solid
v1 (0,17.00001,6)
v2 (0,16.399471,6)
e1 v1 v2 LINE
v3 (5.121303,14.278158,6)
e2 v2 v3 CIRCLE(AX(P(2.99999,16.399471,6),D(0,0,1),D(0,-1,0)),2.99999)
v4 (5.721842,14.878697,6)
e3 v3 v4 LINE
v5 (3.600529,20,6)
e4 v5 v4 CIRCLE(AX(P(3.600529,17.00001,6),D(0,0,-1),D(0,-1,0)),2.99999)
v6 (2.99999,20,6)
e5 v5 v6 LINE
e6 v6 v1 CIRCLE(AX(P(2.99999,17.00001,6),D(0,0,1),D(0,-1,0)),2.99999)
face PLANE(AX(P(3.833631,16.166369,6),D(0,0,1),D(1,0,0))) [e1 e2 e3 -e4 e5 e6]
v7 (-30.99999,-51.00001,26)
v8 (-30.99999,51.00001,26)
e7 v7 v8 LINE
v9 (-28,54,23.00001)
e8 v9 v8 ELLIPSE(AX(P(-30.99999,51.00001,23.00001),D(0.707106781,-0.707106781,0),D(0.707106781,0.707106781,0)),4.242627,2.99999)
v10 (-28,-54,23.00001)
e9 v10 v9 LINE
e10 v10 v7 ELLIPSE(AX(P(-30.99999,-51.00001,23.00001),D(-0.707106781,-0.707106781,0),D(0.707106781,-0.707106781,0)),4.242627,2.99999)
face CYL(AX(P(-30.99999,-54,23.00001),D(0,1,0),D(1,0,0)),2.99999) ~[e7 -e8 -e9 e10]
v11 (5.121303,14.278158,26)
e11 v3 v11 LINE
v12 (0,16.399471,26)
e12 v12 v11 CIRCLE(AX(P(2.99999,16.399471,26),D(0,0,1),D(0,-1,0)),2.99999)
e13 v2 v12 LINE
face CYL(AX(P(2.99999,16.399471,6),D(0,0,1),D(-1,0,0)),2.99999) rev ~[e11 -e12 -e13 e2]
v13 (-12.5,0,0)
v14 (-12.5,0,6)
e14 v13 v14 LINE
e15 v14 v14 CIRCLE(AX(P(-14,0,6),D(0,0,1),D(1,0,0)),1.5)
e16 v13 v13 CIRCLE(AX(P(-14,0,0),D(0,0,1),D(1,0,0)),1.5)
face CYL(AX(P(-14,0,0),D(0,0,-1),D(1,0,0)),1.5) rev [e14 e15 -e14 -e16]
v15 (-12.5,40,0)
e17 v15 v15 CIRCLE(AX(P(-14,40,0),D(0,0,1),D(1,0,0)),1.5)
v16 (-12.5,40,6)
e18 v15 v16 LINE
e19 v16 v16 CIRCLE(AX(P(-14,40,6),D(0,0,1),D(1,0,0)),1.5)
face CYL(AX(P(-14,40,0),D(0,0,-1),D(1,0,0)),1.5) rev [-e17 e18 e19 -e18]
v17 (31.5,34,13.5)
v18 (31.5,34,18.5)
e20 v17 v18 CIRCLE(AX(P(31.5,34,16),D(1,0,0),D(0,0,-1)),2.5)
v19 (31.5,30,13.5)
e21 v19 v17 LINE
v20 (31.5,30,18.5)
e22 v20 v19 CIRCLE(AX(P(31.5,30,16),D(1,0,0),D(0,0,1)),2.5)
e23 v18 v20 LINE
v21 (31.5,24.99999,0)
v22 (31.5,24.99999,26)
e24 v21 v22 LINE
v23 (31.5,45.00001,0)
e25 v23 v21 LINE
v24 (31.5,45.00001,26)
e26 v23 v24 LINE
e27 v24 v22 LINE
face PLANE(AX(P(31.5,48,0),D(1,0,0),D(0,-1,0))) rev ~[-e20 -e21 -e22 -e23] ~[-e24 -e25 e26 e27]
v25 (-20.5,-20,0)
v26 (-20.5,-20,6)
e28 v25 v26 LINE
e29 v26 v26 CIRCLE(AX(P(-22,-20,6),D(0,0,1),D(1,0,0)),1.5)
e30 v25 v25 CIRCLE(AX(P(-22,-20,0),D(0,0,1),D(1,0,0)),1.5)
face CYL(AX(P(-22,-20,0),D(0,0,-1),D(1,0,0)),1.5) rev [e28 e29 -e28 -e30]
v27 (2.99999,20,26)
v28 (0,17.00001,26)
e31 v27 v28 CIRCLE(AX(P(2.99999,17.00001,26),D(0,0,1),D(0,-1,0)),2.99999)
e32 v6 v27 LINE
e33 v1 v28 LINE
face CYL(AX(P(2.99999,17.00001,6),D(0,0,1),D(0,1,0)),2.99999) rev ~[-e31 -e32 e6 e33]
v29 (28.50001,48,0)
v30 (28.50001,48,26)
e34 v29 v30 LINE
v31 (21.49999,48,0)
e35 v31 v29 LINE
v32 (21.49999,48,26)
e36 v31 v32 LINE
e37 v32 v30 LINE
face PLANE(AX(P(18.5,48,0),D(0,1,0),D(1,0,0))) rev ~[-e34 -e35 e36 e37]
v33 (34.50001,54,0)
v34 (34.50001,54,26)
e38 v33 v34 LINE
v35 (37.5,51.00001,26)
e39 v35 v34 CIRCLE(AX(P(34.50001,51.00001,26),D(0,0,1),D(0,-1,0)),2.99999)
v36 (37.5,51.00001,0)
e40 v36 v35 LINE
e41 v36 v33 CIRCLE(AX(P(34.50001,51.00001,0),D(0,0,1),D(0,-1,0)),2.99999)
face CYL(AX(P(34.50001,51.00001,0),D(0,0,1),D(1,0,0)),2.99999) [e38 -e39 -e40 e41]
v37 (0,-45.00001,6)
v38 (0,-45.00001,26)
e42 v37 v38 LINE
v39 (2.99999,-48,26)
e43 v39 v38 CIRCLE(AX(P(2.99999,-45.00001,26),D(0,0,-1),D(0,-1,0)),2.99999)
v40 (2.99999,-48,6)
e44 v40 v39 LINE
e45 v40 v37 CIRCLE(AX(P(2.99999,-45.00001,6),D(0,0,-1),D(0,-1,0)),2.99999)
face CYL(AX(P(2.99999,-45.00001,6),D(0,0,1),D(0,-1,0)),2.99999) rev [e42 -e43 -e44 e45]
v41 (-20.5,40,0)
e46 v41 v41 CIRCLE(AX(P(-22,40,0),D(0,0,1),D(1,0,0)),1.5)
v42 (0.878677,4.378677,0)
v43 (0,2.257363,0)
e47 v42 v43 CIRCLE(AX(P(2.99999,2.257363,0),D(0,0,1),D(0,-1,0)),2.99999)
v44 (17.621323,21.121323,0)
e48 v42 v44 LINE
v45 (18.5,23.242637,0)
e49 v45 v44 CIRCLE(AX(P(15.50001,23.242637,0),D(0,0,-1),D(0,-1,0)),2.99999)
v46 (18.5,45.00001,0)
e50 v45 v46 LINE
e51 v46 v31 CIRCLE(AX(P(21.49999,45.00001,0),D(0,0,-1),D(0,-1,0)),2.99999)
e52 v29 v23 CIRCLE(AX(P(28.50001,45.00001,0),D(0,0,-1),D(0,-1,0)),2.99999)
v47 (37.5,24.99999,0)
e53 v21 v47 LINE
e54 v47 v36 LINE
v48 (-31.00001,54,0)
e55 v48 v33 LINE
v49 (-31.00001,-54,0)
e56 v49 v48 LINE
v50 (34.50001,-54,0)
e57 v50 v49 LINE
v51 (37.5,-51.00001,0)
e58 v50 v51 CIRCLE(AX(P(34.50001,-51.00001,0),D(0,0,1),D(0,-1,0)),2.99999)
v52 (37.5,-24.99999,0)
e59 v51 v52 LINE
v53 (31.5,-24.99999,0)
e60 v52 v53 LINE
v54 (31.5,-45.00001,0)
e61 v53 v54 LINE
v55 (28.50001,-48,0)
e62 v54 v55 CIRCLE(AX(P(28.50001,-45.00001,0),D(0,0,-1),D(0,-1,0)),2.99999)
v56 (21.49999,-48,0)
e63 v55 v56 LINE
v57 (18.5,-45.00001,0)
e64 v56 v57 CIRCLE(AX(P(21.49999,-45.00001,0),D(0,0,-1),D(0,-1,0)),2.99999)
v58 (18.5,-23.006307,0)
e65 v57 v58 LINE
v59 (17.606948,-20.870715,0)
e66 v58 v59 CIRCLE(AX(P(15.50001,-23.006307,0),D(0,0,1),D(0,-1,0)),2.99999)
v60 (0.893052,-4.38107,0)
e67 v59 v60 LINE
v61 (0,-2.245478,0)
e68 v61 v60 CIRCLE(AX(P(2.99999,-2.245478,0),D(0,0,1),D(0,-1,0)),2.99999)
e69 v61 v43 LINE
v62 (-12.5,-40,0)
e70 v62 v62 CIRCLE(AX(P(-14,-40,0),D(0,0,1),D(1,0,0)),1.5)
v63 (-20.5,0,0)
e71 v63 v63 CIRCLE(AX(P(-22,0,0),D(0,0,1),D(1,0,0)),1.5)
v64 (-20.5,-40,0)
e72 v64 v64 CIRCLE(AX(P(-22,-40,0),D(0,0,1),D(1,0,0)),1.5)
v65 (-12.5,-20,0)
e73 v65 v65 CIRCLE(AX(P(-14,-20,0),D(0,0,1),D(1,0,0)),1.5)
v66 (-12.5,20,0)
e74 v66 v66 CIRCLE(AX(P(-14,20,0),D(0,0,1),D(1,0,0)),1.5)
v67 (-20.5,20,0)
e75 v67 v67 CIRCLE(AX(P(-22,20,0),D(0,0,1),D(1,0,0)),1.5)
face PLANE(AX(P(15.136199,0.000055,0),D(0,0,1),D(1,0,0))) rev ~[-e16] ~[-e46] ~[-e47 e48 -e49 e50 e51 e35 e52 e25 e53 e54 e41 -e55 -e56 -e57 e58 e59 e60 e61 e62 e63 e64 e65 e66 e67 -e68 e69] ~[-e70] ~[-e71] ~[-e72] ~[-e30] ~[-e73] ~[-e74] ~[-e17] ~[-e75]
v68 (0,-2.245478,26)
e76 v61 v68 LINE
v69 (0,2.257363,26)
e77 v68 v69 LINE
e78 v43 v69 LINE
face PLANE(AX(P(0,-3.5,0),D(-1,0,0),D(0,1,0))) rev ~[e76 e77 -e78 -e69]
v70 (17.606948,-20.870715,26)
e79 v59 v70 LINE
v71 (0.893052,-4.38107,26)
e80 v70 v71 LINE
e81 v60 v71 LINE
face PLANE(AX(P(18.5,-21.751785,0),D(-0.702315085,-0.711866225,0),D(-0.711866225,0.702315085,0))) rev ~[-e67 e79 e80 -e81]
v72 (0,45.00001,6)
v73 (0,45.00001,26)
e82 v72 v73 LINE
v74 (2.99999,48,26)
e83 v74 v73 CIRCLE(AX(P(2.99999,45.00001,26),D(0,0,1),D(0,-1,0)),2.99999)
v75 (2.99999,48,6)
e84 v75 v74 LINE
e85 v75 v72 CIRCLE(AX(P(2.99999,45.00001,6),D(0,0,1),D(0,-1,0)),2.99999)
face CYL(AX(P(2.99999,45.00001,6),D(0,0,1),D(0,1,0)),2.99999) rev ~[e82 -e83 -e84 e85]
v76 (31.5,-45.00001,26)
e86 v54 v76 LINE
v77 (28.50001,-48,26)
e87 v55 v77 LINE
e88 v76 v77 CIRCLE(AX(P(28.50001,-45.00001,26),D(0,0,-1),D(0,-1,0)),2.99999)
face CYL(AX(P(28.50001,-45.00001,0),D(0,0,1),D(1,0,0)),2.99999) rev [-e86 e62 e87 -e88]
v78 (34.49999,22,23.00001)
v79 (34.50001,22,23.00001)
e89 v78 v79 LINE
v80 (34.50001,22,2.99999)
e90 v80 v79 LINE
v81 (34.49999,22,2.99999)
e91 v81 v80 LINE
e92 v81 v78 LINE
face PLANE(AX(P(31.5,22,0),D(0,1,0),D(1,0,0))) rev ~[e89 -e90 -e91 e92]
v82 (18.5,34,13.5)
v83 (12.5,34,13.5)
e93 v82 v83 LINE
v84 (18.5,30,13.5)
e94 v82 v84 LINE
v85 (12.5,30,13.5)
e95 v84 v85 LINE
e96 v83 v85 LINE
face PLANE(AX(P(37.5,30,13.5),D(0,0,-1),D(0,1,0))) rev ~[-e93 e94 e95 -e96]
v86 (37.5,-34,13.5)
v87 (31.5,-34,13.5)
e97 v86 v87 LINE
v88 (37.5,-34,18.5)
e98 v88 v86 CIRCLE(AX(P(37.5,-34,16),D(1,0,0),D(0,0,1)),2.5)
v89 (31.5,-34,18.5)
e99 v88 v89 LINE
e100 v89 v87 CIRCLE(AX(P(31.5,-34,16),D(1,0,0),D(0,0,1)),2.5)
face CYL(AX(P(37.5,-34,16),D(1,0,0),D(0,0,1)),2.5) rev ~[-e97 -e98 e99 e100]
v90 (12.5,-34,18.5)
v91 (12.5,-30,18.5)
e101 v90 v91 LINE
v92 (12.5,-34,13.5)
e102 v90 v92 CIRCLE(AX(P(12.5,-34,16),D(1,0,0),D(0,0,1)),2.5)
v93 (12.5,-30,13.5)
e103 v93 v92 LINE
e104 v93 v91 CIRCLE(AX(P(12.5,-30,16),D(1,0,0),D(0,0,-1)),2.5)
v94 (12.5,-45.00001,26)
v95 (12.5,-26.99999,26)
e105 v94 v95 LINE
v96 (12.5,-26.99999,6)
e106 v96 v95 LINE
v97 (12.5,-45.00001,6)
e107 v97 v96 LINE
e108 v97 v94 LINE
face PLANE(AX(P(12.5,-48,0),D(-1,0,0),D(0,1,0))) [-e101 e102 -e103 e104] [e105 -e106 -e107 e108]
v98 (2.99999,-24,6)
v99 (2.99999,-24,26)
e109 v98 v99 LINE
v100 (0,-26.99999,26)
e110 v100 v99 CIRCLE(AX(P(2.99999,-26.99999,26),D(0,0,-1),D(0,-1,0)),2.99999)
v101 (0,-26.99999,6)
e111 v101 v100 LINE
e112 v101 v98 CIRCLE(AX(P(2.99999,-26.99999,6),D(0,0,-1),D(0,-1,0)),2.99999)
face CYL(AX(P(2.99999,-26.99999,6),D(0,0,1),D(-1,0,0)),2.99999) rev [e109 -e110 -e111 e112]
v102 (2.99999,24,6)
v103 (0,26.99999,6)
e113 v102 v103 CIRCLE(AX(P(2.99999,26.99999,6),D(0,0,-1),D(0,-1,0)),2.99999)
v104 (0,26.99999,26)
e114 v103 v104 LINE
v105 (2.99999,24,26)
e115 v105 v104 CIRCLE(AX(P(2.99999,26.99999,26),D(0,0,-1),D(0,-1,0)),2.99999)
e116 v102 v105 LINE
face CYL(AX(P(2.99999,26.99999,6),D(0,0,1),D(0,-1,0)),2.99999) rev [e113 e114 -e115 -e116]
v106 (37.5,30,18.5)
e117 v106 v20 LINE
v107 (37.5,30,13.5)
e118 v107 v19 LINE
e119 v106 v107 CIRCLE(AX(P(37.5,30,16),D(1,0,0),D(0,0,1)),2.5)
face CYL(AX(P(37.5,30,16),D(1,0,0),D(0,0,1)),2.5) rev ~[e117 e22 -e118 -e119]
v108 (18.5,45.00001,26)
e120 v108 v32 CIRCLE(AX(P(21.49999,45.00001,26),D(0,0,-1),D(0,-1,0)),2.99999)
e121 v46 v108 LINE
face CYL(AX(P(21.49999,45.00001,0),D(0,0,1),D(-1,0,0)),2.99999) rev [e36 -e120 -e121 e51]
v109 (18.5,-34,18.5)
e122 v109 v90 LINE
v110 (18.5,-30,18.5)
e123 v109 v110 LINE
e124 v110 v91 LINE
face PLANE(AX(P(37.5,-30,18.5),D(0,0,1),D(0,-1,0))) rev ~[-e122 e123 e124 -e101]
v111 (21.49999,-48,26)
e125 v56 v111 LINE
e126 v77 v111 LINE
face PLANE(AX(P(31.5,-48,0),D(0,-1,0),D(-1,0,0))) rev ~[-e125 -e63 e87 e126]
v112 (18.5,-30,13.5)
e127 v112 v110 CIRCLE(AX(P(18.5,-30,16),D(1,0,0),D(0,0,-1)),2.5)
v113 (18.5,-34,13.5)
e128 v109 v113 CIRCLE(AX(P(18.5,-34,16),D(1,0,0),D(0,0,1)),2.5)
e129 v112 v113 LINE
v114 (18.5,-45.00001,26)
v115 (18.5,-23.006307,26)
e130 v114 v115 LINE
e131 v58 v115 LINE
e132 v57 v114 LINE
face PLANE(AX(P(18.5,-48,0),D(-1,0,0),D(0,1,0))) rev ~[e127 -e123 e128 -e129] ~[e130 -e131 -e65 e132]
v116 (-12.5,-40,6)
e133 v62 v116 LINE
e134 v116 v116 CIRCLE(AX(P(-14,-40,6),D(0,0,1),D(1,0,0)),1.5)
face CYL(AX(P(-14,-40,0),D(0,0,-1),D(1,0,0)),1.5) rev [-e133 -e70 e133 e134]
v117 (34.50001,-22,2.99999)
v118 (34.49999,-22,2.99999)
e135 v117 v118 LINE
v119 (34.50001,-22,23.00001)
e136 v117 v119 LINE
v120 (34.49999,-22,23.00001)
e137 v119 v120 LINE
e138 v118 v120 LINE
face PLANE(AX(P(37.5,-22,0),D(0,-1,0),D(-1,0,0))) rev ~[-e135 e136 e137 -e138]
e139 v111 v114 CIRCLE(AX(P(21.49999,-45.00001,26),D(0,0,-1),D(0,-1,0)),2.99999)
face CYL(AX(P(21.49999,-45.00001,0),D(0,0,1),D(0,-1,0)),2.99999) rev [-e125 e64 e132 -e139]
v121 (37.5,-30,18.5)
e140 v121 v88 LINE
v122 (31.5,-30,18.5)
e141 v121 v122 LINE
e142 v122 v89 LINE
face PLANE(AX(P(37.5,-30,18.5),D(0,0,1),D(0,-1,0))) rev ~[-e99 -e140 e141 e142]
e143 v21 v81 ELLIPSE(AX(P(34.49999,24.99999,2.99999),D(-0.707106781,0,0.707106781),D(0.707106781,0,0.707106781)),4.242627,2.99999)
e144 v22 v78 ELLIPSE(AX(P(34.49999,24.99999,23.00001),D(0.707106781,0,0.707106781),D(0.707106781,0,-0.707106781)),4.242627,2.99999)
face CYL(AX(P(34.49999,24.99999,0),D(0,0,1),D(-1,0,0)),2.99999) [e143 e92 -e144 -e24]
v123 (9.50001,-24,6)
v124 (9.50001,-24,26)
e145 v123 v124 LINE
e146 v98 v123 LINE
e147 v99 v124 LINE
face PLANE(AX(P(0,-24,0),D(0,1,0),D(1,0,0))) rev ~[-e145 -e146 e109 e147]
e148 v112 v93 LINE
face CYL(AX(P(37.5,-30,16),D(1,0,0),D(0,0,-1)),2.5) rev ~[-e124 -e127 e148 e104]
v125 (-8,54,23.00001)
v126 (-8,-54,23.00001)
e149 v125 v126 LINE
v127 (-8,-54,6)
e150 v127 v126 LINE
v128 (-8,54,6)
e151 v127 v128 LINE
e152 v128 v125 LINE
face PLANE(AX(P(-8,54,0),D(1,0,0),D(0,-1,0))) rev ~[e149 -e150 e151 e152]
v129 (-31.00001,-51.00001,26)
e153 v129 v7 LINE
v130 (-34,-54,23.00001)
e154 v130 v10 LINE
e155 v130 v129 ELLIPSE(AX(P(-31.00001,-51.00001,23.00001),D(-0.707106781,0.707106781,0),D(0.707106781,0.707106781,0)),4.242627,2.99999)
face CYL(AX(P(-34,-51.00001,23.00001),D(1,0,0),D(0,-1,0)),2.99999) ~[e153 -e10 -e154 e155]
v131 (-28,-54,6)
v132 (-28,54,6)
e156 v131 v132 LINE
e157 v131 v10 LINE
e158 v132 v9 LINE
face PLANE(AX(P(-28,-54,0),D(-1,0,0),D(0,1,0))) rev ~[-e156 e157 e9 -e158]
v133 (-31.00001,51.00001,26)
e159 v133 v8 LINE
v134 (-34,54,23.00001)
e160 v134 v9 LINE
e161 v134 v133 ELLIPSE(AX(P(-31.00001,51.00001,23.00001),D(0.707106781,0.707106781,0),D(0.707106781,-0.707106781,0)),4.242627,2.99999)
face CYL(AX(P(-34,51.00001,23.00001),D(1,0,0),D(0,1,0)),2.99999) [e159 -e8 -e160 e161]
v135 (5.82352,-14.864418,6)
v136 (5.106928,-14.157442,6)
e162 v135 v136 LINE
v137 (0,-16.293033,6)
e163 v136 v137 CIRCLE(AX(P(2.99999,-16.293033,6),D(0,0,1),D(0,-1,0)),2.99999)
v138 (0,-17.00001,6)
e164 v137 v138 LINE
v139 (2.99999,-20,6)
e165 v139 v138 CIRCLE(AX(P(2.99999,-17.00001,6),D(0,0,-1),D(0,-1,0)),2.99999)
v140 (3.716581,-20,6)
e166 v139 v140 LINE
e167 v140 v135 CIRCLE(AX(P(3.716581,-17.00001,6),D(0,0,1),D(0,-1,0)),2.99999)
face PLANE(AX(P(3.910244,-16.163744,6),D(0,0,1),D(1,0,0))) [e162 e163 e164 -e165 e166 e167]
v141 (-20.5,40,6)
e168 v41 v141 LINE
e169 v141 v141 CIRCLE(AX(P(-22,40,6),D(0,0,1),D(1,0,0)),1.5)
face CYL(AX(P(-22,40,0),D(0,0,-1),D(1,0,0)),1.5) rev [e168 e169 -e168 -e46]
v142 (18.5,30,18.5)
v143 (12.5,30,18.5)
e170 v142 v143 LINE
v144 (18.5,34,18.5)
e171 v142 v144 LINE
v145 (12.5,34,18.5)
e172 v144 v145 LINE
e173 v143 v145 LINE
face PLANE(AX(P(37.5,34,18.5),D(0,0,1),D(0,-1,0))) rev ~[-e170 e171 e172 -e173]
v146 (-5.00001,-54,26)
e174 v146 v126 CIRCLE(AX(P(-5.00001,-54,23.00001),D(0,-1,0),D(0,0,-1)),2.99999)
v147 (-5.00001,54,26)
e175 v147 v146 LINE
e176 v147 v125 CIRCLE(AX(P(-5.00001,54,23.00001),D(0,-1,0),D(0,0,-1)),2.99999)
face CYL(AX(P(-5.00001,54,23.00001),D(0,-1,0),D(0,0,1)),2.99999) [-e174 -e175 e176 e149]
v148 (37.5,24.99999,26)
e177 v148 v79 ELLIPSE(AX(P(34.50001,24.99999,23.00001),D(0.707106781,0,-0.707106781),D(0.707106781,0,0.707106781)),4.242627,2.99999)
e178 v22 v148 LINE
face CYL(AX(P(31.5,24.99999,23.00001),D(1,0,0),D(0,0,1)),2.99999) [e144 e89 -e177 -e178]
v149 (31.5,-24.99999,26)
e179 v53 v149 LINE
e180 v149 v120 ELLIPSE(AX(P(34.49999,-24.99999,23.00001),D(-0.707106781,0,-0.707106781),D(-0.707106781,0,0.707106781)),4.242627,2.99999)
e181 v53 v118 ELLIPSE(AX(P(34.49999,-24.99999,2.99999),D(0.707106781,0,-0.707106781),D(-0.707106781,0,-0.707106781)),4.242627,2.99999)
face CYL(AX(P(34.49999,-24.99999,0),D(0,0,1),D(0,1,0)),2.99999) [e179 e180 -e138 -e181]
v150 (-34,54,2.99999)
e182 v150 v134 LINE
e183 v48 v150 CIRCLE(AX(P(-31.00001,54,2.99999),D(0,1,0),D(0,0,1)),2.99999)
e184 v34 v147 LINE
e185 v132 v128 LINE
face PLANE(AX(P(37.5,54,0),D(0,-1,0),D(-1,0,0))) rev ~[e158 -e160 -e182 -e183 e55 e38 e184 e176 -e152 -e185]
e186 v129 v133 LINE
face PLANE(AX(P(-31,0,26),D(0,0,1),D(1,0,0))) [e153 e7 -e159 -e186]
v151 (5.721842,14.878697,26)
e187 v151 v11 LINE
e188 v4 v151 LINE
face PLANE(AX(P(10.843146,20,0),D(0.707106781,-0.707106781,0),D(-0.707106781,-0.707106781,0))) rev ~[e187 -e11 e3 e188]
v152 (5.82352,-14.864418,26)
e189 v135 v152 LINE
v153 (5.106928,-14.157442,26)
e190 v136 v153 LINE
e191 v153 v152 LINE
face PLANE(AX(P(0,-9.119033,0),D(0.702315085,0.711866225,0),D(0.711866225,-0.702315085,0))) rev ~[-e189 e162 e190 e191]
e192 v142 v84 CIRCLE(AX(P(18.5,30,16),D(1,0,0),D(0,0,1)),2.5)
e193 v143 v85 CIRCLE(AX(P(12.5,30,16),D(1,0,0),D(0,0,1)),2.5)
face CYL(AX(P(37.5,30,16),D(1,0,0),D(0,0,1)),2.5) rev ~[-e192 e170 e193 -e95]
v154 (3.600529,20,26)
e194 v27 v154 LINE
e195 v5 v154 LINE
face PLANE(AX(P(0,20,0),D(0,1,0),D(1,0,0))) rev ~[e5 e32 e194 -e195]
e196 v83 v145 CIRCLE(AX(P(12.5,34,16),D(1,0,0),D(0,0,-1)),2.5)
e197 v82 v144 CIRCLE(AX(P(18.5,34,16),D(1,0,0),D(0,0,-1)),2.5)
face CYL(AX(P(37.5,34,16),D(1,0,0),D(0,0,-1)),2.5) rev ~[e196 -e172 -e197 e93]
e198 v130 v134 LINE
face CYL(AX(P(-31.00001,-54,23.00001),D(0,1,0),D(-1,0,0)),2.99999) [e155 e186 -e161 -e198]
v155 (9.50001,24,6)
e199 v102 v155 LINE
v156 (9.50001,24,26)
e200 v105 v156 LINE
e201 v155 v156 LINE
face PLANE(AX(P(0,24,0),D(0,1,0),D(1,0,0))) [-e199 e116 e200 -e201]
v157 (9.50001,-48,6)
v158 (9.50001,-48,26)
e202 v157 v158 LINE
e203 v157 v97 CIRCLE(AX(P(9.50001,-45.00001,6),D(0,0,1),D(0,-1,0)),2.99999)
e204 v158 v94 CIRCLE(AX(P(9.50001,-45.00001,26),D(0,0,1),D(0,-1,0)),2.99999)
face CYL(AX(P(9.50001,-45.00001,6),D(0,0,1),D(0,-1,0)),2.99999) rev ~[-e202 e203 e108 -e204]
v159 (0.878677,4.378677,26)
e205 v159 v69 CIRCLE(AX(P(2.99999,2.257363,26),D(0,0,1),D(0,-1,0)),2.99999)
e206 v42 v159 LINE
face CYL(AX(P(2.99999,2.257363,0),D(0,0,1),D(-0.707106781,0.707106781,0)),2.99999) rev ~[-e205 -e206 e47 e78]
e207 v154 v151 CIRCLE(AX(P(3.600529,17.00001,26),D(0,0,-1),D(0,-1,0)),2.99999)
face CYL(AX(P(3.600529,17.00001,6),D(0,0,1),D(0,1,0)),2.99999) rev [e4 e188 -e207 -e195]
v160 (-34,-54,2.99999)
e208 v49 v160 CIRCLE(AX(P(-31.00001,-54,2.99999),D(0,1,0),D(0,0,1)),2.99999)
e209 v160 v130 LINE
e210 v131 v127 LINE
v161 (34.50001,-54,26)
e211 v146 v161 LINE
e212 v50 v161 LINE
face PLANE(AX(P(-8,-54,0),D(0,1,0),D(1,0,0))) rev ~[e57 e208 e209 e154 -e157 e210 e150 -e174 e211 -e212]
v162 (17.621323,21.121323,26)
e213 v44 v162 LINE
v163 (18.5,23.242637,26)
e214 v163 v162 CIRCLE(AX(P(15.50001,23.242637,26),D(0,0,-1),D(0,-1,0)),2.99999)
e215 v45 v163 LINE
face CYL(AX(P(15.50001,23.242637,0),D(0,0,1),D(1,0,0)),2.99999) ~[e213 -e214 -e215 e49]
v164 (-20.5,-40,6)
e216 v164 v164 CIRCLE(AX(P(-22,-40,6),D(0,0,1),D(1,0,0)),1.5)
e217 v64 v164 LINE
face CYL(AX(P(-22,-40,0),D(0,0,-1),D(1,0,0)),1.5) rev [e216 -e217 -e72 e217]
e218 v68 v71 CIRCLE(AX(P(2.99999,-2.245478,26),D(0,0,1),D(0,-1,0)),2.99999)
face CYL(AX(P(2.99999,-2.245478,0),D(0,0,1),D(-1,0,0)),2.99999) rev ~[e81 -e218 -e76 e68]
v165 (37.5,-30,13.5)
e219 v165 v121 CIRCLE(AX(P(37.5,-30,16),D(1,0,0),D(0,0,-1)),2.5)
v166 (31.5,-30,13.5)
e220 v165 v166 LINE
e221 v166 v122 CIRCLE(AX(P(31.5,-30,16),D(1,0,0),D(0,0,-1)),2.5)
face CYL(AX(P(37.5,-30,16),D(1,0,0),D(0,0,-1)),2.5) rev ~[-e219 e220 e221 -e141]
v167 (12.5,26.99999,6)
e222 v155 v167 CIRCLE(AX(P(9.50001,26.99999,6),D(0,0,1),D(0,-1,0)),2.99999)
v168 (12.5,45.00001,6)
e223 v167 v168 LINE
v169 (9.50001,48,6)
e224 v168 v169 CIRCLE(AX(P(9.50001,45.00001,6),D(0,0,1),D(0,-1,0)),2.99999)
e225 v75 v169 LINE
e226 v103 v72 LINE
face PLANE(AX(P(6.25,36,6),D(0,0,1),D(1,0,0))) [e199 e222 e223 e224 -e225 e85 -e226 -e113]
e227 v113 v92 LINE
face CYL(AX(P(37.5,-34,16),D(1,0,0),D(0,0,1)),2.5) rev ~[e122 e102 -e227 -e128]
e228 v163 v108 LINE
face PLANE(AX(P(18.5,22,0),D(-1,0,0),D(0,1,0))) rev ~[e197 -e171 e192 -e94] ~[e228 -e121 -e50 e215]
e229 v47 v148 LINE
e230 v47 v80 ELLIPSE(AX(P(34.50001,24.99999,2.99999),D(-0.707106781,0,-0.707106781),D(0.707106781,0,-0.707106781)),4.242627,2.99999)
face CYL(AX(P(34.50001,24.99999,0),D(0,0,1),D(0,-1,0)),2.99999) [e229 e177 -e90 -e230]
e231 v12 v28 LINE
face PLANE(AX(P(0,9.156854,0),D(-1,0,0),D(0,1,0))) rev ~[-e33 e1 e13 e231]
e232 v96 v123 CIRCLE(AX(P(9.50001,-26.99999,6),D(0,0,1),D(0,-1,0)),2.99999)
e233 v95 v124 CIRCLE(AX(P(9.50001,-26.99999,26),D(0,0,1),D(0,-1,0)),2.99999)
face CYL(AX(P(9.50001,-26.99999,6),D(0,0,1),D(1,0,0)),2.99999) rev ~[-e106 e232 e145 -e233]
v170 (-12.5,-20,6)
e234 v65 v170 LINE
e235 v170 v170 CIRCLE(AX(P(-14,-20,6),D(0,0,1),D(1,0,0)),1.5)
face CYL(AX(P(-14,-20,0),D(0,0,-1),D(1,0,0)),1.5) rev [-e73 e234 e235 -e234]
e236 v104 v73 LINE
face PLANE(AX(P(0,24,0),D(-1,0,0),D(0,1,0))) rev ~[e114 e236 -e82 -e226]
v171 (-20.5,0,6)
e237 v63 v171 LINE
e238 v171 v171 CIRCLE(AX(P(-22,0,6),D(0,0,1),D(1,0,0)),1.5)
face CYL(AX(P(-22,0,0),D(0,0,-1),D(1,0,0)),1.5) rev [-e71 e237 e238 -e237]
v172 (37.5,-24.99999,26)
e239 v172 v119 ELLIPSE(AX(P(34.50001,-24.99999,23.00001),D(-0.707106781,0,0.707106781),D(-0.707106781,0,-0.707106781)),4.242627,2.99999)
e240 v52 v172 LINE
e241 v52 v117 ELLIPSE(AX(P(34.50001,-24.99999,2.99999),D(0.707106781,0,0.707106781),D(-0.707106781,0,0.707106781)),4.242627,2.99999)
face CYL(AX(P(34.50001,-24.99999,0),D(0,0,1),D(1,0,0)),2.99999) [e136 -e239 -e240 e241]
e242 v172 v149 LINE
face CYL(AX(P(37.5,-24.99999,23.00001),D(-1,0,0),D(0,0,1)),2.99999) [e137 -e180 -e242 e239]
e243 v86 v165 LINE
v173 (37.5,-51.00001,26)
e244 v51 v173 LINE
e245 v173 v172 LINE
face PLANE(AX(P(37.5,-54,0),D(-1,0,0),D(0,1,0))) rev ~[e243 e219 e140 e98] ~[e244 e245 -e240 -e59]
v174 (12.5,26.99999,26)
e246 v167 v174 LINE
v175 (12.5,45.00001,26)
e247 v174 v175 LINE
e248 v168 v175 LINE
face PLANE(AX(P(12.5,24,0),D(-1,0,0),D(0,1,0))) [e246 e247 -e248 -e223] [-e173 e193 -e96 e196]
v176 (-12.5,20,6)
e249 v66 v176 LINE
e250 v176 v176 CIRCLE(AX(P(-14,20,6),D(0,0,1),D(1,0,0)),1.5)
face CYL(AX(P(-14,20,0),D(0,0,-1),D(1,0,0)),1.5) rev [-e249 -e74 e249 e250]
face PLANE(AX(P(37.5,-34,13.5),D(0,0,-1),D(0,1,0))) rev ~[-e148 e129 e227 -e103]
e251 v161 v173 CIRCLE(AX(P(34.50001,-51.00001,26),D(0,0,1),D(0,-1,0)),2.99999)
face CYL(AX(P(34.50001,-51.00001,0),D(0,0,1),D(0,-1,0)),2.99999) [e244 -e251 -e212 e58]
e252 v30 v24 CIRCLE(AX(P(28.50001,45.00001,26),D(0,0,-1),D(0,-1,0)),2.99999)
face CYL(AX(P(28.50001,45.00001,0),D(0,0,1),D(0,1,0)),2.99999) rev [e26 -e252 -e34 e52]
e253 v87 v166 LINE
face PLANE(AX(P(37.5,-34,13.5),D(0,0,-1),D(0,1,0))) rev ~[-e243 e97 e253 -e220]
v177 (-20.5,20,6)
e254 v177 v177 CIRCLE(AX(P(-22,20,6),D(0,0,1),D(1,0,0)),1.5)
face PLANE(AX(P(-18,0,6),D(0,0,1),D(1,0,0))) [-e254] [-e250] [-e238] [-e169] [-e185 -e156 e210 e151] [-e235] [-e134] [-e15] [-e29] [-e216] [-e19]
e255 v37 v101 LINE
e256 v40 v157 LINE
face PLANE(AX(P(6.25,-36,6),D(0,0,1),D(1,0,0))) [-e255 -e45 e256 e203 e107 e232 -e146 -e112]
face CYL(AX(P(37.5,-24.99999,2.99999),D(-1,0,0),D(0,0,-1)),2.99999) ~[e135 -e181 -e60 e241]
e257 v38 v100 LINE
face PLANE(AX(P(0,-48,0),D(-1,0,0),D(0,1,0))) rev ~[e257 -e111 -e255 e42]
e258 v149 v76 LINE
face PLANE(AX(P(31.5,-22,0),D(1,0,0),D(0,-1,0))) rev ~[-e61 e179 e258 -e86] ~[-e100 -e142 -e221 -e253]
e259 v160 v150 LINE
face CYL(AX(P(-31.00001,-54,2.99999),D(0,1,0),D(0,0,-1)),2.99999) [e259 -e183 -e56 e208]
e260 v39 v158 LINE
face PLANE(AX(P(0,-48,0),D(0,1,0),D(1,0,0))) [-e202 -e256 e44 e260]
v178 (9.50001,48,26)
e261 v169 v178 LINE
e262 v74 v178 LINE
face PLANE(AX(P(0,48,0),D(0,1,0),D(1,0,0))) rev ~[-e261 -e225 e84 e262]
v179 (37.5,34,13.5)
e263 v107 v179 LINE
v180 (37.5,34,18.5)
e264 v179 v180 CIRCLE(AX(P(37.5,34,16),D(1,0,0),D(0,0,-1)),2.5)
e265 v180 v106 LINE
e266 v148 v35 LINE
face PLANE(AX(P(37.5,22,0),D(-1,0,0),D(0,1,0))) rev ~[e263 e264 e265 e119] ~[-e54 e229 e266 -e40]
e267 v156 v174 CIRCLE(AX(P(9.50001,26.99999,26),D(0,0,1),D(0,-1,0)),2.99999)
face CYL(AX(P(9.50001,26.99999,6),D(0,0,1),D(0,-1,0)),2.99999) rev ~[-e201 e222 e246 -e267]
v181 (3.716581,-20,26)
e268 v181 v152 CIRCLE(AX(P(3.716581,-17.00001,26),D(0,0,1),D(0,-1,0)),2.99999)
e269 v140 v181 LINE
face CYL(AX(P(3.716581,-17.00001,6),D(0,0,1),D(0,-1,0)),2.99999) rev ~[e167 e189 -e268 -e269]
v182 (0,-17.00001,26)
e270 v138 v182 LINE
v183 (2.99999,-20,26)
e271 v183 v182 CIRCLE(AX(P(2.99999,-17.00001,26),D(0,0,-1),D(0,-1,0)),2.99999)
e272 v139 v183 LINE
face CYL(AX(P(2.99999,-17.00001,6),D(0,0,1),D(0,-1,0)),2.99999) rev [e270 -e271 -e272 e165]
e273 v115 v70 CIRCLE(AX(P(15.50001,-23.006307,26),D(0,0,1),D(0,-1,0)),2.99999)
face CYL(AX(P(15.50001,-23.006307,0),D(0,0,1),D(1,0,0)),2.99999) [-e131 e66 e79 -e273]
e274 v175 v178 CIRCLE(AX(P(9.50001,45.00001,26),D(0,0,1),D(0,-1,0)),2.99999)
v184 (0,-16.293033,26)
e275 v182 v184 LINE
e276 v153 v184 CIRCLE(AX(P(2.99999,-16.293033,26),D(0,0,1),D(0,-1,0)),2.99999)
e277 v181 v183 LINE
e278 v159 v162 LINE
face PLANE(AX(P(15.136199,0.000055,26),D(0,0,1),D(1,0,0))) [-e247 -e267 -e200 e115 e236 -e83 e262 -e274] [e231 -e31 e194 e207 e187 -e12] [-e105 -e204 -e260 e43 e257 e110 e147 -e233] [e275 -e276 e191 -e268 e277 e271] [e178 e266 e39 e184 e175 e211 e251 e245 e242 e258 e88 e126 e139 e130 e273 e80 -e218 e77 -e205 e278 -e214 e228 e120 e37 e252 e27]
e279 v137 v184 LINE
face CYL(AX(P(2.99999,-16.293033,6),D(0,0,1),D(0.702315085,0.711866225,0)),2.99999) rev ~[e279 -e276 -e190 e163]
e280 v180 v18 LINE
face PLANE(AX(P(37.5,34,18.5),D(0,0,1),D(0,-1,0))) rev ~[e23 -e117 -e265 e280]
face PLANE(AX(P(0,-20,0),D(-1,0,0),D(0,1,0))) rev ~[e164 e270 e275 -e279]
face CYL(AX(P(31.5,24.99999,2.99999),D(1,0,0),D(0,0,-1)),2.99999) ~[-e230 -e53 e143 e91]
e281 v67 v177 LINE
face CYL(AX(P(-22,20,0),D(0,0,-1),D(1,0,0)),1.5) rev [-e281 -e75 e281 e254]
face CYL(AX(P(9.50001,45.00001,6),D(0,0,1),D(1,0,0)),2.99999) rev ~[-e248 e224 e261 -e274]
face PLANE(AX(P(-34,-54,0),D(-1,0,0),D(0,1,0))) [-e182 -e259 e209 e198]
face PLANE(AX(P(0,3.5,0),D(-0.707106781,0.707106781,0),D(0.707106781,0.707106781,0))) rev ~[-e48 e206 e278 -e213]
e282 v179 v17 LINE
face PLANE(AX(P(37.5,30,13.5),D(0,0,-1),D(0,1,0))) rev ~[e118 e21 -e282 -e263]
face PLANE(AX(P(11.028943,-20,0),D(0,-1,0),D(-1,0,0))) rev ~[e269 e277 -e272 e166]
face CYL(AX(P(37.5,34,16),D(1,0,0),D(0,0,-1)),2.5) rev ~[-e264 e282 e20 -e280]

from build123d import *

# Parameters (mm, degrees)
F0_W     = 12.5
F0_H     = 24
F1_DEPTH = 6
F0_W_2   = 20
F0_H_2   = 108
F0_R     = 1.5
F0_W_3   = 6
F2_DEPTH = 26
F5_DEPTH = 30
F6_R     = 2.99999


# Not quite as in the source:
# - a fillet or chamfer is up to 0.001 mm smaller than in the source, because OpenCascade refuses the exact size


with BuildPart() as f1:
    # F0 (on Top) → F1 (new body)
    with BuildSketch(Plane.XY):
        with Locations((6.25, -36)):
            Rectangle(F0_W, F0_H)
    extrude(amount=F1_DEPTH)



with BuildPart() as f1b:
    # F0 (on Top) → F1, piece 2 (new body)
    with BuildSketch(Plane.XY):
        Polygon((11.0289425277, -20), (0, -9.1190332702), (0, -20), align=None)
    extrude(amount=F1_DEPTH)


with BuildPart() as f1c:
    # F0 (on Top) → F1, piece 3 (new body)
    with BuildSketch(Plane.XY):
        with Locations((6.25, 36)):
            Rectangle(F0_W, F0_H)
    extrude(amount=F1_DEPTH)


with BuildPart() as f1d:
    # F0 (on Top) → F1, piece 4 (new body)
    with BuildSketch(Plane.XY):
        with Locations((-18, 0)):
            Rectangle(F0_W_2, F0_H_2)
        with Locations((-22, -40)):
            Circle(F0_R, mode=Mode.SUBTRACT)
        with Locations((-14, -40)):
            Circle(F0_R, mode=Mode.SUBTRACT)
        with Locations((-22, -20)):
            Circle(F0_R, mode=Mode.SUBTRACT)
        with Locations((-14, -20)):
            Circle(F0_R, mode=Mode.SUBTRACT)
        with Locations((-22, 0)):
            Circle(F0_R, mode=Mode.SUBTRACT)
        with Locations((-22, 20)):
            Circle(F0_R, mode=Mode.SUBTRACT)
        with Locations((-14, 0)):
            Circle(F0_R, mode=Mode.SUBTRACT)
        with Locations((-14, 20)):
            Circle(F0_R, mode=Mode.SUBTRACT)
        with Locations((-22, 40)):
            Circle(F0_R, mode=Mode.SUBTRACT)
        with Locations((-14, 40)):
            Circle(F0_R, mode=Mode.SUBTRACT)
    extrude(amount=F1_DEPTH)


with BuildPart() as f1e:
    # F0 (on Top) → F1, piece 5 (new body)
    with BuildSketch(Plane.XY):
        Polygon((0, 20), (0, 9.1568542495), (10.8431457505, 20), align=None)
    extrude(amount=F1_DEPTH)


with BuildPart() as f1_1:
    add(f1.part)

    add(f1b.part)  # F2 merges F1b

    add(f1c.part)  # F2 merges F1c

    add(f1d.part)  # F2 merges F1d

    add(f1e.part)  # F2 merges F1e
    # F0 (on Top) → F2 (join)
    with BuildSketch(Plane.XY):
        Polygon((18.5, 22), (18.5, 48), (31.5, 48), (31.5, 22), (37.5, 22), (37.5, 54), (-8, 54), (-8, -54), (37.5, -54), (37.5, -22), (31.5, -22), (31.5, -48), (18.5, -48), (18.5, -21.7517847015), (0, -3.5), (0, 3.5), align=None)
        with Locations((6.25, -36)):
            Rectangle(F0_W, F0_H, mode=Mode.SUBTRACT)
        Polygon((0, -20), (0, -9.1190332702), (11.0289425277, -20), align=None, mode=Mode.SUBTRACT)
        Polygon((10.8431457505, 20), (0, 9.1568542495), (0, 20), align=None, mode=Mode.SUBTRACT)
        with Locations((6.25, 36)):
            Rectangle(F0_W, F0_H, mode=Mode.SUBTRACT)
        with Locations((-31, 0)):
            Rectangle(F0_W_3, F0_H_2)
    extrude(amount=F2_DEPTH)

    # F4 (on offset) → F5 (cut)
    with BuildSketch(Plane.YZ.offset(37.5)):
        with BuildLine():
            ThreePointArc((-34, 18.5), (-36.5, 16), (-34, 13.5))
            Line((-34, 13.5), (-30, 13.5))
            ThreePointArc((-30, 13.5), (-27.5, 16), (-30, 18.5))
            Line((-30, 18.5), (-34, 18.5))
        make_face()
        with BuildLine():
            Line((34, 18.5), (30, 18.5))
            ThreePointArc((30, 18.5), (27.5, 16), (30, 13.5))
            Line((30, 13.5), (34, 13.5))
            ThreePointArc((34, 13.5), (36.5, 16), (34, 18.5))
        make_face()
    extrude(amount=-F5_DEPTH, mode=Mode.SUBTRACT)

    # F6 (radius 3 in the source; OpenCascade refuses exactly that, so slightly less here)
    f6_edges = [f1_1.edges().sort_by_distance(p)[0] for p in [
        (0, 48, 16),
        (18.5, 48, 13),
        (31.5, 48, 13),
        (12.5, 48, 16),
        (12.5, -24, 16),
        (0, -24, 16),
        (0, 20, 16),
        (0, -9.119033, 16),
        (0, -20, 16),
        (11.028943, -20, 16),
        (10.843146, 20, 16),
        (0, 9.156854, 16),
        (0, -48, 16),
        (18.5, -48, 13),
        (0, 24, 16),
        (12.5, 24, 16),
        (12.5, -48, 16),
        (31.5, -48, 13),
        (37.5, -54, 13),
        (37.5, 54, 13),
        (34.5, 22, 26),
        (34.5, -22, 26),
        (34.5, -22, 0),
        (34.5, 22, 0),
        (0, -3.5, 13),
        (0, 3.5, 13),
        (18.5, -21.751785, 13),
        (18.5, 22, 13),
        (31.5, 22, 13),
        (37.5, 22, 13),
        (31.5, -22, 13),
        (37.5, -22, 13),
        (-31, -54, 26),
        (-31, 54, 26),
        (-34, 0, 0),
        (-28, 0, 26),
        (-8, 0, 26),
        (-34, 0, 26),
    ]]
    fillet(f6_edges, radius=F6_R)


solid = f1_1.part
